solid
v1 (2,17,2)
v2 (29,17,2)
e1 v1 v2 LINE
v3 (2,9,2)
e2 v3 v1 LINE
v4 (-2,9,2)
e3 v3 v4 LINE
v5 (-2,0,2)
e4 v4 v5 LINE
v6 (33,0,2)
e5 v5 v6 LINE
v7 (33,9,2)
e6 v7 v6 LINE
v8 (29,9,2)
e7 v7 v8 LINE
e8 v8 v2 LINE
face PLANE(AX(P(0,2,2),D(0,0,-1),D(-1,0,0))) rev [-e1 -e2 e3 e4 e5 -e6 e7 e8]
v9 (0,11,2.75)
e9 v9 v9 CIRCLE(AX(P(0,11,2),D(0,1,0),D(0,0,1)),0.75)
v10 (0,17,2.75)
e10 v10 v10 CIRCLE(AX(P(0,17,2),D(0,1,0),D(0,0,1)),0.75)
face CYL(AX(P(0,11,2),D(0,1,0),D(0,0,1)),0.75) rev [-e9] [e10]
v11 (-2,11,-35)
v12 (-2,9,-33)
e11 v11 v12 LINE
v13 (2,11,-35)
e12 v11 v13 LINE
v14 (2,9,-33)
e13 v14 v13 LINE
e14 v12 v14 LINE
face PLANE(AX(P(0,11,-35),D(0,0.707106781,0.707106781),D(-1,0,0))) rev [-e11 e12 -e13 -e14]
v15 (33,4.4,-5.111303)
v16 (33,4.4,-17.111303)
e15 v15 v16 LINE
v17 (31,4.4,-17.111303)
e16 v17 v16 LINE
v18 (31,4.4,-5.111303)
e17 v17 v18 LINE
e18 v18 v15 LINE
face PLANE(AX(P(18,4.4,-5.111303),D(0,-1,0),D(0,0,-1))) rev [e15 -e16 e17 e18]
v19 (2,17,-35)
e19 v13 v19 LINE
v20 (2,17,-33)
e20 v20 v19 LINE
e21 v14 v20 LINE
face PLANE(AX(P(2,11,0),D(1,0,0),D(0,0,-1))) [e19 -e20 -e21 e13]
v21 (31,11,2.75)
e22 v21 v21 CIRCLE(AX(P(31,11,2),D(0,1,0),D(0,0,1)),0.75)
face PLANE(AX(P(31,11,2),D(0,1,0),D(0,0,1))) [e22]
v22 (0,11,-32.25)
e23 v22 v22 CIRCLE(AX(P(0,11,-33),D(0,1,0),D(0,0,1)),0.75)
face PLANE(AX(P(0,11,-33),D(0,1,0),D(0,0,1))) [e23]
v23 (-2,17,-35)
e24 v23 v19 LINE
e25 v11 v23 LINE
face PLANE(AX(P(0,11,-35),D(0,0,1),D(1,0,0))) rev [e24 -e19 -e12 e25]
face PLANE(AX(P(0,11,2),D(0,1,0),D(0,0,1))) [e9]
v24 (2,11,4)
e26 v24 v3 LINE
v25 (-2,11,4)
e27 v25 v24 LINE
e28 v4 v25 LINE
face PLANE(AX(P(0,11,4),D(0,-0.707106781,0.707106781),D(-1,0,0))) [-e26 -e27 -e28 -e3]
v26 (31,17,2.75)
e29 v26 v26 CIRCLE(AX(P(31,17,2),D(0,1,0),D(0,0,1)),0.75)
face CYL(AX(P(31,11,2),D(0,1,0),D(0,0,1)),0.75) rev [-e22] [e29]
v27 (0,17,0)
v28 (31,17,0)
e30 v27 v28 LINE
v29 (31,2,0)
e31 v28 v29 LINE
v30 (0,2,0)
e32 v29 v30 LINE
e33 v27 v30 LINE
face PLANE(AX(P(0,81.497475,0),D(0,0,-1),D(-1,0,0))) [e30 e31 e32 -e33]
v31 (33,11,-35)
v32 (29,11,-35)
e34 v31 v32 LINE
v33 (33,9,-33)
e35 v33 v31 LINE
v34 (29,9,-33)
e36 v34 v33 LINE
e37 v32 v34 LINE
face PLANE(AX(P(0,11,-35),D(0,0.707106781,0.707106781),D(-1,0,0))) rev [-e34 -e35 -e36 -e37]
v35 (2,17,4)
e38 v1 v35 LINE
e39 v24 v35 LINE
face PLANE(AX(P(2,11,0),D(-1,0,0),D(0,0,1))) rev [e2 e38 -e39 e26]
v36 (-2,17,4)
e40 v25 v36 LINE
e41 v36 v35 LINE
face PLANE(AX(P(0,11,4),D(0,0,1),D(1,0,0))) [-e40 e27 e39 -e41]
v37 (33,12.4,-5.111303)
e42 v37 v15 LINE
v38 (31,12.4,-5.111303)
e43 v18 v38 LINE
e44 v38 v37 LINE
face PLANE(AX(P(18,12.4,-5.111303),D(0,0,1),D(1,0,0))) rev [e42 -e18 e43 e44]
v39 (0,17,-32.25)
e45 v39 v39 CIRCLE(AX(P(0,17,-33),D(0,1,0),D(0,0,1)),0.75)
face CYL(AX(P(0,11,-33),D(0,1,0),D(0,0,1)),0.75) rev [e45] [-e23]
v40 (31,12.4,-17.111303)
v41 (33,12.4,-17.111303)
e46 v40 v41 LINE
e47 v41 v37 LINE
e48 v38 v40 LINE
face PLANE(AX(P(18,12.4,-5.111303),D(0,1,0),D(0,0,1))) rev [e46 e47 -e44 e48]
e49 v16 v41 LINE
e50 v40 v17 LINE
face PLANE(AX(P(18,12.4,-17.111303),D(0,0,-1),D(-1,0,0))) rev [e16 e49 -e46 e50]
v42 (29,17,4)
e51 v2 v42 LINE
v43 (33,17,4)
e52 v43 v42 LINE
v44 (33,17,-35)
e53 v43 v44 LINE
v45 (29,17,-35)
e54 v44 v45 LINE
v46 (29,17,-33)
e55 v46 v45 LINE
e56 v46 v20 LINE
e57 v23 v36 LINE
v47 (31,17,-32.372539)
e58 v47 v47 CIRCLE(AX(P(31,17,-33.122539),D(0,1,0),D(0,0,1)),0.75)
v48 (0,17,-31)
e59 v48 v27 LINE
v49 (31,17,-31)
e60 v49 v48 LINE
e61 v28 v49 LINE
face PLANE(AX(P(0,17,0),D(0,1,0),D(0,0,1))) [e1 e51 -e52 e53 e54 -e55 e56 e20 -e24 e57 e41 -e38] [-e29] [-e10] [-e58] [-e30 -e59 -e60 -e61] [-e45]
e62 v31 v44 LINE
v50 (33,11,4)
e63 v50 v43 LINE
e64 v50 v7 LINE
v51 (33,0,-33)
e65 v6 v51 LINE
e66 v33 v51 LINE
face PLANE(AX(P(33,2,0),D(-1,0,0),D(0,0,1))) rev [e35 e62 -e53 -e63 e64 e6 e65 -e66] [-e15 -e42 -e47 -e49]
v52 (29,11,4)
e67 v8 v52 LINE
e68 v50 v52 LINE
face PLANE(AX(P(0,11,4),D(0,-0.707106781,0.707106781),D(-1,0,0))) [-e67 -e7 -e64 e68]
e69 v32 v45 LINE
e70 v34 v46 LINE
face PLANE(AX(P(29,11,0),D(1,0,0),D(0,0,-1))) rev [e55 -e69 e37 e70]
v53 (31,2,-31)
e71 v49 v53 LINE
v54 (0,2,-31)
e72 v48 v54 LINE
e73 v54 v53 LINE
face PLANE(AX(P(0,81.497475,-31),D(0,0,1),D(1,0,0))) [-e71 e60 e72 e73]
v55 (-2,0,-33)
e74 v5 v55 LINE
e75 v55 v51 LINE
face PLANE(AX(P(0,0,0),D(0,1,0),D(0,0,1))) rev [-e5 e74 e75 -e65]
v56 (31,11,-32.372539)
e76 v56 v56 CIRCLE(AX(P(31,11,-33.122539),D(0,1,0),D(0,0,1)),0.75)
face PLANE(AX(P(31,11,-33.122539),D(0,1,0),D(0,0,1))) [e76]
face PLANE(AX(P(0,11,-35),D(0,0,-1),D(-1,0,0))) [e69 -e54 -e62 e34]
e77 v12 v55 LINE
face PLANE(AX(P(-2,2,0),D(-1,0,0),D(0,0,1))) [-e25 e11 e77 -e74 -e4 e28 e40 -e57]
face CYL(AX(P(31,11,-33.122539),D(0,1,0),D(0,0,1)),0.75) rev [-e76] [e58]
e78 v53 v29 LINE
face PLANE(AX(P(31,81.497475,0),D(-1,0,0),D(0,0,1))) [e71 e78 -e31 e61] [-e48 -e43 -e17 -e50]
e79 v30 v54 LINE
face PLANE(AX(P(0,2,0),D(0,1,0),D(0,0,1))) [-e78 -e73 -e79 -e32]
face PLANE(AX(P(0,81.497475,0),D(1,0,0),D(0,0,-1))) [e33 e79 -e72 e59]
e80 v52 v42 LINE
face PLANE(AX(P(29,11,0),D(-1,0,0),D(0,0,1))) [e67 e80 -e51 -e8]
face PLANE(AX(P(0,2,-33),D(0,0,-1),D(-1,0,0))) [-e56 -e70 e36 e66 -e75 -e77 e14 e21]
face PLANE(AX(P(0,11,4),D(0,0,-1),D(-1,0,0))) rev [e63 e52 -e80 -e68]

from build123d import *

# Parameters (mm, degrees)
SKETCH1_W           = 35
SKETCH1_H           = 35
SKETCH1_W_2         = 31
SKETCH1_H_2         = 31
BOSS_EXTRUDE1_DEPTH = 2
SKETCH1_3_W         = 35
SKETCH1_3_H         = 35
SKETCH1_3_W_2       = 31
SKETCH1_3_H_2       = 31
BOSS_EXTRUDE2_DEPTH = 17
SKETCH2_W           = 12
SKETCH2_H           = 8
CUT_EXTRUDE1_DEPTH  = 15
SKETCH3_W           = 4
SKETCH3_H           = 2
BOSS_EXTRUDE3_DEPTH = 6
CHAMFER1_SIZE       = 2
SKETCH4_R           = 0.75
CUT_EXTRUDE2_DEPTH  = 6


with BuildPart() as part:
    # Sketch1 → Boss-Extrude1 (new body)
    # profile 1 of 2: a face of its own
    with BuildSketch(Plane(origin=(0, 0, 0), x_dir=(1, 0, 0), z_dir=(0, 1, 0))):
        with Locations((15.5, 15.5)):
            Rectangle(SKETCH1_W, SKETCH1_H)
        with Locations((15.5, 15.5)):
            Rectangle(SKETCH1_W_2, SKETCH1_H_2, mode=Mode.SUBTRACT)
    # profile 2 of 2: a face of its own
    with BuildSketch(Plane(origin=(0, 0, 0), x_dir=(1, 0, 0), z_dir=(0, 1, 0))):
        with Locations((15.5, 15.5)):
            Rectangle(SKETCH1_W_2, SKETCH1_H_2)
    extrude(amount=BOSS_EXTRUDE1_DEPTH)

    # Sketch1<3> → Boss-Extrude2 (add)
    with BuildSketch(Plane(origin=(0, 0, 0), x_dir=(1, 0, 0), z_dir=(0, 1, 0))):
        with Locations((15.5, 15.5)):
            Rectangle(SKETCH1_3_W, SKETCH1_3_H)
        with Locations((15.5, 15.5)):
            Rectangle(SKETCH1_3_W_2, SKETCH1_3_H_2, mode=Mode.SUBTRACT)
    extrude(amount=BOSS_EXTRUDE2_DEPTH)

    # Sketch2 → Cut-Extrude1 (cut)
    with BuildSketch(Plane(origin=(33, 0, 0), x_dir=(0, 0, -1), z_dir=(1, 0, 0))):
        with Locations((11.111303283, 8.4)):
            Rectangle(SKETCH2_W, SKETCH2_H)
    extrude(amount=-CUT_EXTRUDE1_DEPTH, mode=Mode.SUBTRACT)

    # Sketch3 → Boss-Extrude3 (add)
    with BuildSketch(Plane(origin=(0, 17, 0), x_dir=(1, 0, 0), z_dir=(0, 1, 0))):
        with Locations((31, 34)):
            Rectangle(SKETCH3_W, SKETCH3_H)
        with Locations((0, 34)):
            Rectangle(SKETCH3_W, SKETCH3_H)
        with Locations((0, -3)):
            Rectangle(SKETCH3_W, SKETCH3_H)
        with Locations((31, -3)):
            Rectangle(SKETCH3_W, SKETCH3_H)
    extrude(amount=-BOSS_EXTRUDE3_DEPTH)

    # Chamfer1
    chamfer1_edges = [part.edges().sort_by_distance(p)[0] for p in [
        (31, 11, 2),
        (0, 11, 2),
        (0, 11, -33),
        (31, 11, -33),
    ]]
    chamfer(chamfer1_edges, length=CHAMFER1_SIZE - 0.0001)  # a hair under: the kernel refuses the full size

    # Sketch4 → Cut-Extrude2 (cut)
    with BuildSketch(Plane(origin=(0, 17, 0), x_dir=(1, 0, 0), z_dir=(0, 1, 0))):
        with Locations(Location((31, 33.122538924, 0), (0, 0, 270))):
            Circle(SKETCH4_R)
        with Locations(Location((31, -2, 0), (0, 0, 270))):
            Circle(SKETCH4_R)
        with Locations(Location((0, -2, 0), (0, 0, 270))):
            Circle(SKETCH4_R)
        with Locations(Location((0, 33, 0), (0, 0, 270))):
            Circle(SKETCH4_R)
    extrude(amount=-CUT_EXTRUDE2_DEPTH, mode=Mode.SUBTRACT)


solid = part.part
